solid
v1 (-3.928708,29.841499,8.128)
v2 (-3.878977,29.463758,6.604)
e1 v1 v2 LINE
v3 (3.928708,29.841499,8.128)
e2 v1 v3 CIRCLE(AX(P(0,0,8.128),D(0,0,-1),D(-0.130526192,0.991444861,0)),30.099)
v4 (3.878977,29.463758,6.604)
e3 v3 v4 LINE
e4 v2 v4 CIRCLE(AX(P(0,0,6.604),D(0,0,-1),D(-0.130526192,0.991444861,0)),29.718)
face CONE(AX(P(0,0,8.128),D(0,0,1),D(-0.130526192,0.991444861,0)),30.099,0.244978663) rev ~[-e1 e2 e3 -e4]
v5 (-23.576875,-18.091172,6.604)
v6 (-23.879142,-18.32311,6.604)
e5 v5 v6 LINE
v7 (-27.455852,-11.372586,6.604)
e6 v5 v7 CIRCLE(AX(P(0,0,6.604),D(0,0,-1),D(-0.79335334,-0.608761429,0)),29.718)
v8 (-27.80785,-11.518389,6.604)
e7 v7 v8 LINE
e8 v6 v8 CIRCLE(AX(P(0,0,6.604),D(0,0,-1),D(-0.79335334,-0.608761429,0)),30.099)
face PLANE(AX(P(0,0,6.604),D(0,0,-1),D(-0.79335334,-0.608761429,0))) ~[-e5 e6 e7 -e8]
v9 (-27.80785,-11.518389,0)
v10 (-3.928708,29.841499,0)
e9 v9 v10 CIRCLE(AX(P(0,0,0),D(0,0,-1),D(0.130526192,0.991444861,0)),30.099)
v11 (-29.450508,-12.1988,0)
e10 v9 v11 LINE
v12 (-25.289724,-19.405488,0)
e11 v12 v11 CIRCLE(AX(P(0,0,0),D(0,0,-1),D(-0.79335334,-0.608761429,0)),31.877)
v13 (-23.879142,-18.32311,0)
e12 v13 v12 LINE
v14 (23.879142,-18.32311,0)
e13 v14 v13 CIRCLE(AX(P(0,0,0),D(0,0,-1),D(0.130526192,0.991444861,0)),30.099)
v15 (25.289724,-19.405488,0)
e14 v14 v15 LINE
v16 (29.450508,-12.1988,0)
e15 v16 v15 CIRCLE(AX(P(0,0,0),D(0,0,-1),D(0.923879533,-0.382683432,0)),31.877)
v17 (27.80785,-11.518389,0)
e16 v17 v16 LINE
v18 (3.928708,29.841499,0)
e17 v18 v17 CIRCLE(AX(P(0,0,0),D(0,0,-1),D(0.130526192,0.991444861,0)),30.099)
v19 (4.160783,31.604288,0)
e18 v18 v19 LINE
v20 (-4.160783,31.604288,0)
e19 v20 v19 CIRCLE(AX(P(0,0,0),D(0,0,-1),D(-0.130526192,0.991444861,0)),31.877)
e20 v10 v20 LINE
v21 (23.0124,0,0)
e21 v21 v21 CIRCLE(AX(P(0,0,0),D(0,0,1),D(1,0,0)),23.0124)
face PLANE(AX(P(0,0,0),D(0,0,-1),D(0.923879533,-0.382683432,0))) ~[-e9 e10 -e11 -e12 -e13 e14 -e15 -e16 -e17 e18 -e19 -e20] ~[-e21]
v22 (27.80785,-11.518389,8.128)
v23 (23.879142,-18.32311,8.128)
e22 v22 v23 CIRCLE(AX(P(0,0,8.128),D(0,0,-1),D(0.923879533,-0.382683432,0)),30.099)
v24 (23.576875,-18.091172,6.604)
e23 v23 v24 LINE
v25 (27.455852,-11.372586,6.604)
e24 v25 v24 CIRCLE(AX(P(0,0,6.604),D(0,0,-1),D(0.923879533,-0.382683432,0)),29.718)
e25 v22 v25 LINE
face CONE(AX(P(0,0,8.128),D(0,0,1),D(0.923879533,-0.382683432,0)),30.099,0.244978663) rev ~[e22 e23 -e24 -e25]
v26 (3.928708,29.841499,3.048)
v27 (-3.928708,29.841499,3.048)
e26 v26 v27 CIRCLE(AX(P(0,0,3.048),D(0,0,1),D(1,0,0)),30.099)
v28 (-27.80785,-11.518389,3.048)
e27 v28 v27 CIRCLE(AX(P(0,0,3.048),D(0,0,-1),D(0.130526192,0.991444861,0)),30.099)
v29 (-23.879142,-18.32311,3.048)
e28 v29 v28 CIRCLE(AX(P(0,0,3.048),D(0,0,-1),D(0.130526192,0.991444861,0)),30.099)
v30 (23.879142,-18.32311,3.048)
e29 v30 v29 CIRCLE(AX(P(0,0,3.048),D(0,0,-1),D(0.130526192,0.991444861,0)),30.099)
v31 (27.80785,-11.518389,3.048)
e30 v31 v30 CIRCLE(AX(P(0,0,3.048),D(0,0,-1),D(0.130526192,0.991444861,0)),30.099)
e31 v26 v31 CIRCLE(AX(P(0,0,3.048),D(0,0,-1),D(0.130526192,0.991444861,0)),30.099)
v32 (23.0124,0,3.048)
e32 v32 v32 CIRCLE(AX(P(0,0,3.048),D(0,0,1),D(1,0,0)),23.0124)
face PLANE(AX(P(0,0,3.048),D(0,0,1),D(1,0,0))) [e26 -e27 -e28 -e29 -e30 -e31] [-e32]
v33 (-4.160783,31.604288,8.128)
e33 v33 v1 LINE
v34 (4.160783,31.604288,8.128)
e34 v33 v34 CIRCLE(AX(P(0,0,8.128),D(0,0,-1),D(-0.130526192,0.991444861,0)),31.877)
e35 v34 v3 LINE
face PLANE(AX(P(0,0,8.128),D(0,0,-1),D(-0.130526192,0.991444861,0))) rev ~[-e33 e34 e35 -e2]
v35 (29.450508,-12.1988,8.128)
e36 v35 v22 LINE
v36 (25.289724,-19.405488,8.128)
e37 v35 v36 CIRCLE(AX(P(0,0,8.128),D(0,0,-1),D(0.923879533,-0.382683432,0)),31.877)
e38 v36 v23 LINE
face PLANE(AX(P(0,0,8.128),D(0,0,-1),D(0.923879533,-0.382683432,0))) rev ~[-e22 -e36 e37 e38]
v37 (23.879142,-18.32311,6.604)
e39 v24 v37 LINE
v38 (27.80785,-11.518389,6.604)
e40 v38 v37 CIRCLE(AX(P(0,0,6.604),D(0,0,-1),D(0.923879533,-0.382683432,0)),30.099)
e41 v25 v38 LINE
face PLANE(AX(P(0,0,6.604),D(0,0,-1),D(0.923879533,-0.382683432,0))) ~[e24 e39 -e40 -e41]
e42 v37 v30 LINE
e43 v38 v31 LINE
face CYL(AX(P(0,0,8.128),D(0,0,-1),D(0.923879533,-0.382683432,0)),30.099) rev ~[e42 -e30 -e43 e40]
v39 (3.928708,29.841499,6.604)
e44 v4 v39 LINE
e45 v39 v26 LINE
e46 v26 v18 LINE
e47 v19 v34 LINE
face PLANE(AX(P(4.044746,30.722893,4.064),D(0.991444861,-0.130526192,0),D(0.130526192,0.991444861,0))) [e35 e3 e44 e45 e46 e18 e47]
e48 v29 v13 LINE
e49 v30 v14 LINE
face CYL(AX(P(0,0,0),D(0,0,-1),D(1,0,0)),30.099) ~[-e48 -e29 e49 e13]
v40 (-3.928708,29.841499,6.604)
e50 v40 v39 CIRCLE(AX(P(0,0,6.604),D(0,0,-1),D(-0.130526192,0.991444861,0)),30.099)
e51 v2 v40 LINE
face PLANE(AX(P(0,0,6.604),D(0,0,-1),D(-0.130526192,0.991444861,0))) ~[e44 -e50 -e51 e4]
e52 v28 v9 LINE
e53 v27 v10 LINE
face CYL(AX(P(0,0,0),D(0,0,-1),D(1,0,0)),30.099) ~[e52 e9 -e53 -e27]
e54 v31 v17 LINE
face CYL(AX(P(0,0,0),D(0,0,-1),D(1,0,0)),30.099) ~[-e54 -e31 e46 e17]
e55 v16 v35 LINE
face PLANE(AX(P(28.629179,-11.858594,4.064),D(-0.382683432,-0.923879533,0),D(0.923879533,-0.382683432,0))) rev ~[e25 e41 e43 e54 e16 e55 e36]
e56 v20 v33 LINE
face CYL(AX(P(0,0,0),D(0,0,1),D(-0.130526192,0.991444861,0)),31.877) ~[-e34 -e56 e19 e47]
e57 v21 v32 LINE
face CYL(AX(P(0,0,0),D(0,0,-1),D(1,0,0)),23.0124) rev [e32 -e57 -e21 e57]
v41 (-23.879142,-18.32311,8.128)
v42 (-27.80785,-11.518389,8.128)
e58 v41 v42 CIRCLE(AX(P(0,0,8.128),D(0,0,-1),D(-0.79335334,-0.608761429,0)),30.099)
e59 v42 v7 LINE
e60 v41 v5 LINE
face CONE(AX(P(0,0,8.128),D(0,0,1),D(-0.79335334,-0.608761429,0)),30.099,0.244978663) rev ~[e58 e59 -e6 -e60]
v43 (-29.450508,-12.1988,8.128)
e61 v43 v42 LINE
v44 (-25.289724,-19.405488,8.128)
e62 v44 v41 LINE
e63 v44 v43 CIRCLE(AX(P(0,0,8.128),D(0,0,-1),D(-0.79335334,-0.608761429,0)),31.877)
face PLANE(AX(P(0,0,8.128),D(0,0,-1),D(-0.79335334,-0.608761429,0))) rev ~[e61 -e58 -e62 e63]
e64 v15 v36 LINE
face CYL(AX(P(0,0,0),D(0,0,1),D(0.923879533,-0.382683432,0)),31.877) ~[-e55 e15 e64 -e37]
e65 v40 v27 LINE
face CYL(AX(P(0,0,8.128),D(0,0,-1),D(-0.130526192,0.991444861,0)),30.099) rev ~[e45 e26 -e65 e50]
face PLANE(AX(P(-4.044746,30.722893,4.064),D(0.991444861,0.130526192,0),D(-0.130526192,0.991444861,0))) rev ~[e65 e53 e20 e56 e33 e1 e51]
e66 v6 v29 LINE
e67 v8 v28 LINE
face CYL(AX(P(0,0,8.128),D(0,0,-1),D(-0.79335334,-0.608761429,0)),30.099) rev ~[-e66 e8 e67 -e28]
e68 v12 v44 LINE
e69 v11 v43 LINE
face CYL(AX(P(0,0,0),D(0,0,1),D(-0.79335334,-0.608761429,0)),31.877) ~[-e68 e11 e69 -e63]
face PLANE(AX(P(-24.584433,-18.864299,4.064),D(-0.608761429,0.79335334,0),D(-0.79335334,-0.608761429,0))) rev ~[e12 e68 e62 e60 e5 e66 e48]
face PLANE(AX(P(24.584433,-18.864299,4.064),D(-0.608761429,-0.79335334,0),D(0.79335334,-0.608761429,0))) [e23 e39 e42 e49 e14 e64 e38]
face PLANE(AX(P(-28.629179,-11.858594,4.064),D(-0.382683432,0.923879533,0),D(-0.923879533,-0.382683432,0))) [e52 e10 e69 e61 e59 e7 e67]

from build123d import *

# Parameters (mm, degrees)
F0_R            = 30.099
F0_R_2          = 23.0124
F1_DEPTH        = 3.048
F3_ANGLE_BACK   = 7.5
F3_ANGLE        = 15
F3_COPIES_COUNT = 3


# Not quite as in the source:
# - a pattern or mirror of a feature is missing from the dataset's text; its kind, count and spacing are read off the source's solid


with BuildPart() as f1:
    # F0 (on Top) → F1 (new body)
    with BuildSketch(Plane.XY):
        Circle(F0_R)
        Circle(F0_R_2, mode=Mode.SUBTRACT)
    extrude(amount=F1_DEPTH)

    # F2 (on Right) → F3 (revolve)
    with BuildSketch(Plane.YZ, mode=Mode.PRIVATE) as f3_sk:
        Polygon((30.099, 6.604), (30.099, 3.048), (30.099, 0), (31.877, 0), (31.877, 8.128), (30.099, 8.128), align=None)
        Polygon((29.718, 6.604), (30.099, 6.604), (30.099, 8.128), align=None)
    f3 = revolve(f3_sk.sketch.rotate(Axis((0, 0, 0), (0, 0, -1)), -F3_ANGLE_BACK), axis=Axis((0, 0, 0), (0, 0, -1)), revolution_arc=F3_ANGLE)

    # F3_copies: F3 ×3 about axis
    f3_copies_axis = Axis((0, 0, 0), (0, 0, 1))
    for i in range(1, F3_COPIES_COUNT):
        add(f3.rotate(f3_copies_axis, i * 360 / F3_COPIES_COUNT))


solid = f1.part
